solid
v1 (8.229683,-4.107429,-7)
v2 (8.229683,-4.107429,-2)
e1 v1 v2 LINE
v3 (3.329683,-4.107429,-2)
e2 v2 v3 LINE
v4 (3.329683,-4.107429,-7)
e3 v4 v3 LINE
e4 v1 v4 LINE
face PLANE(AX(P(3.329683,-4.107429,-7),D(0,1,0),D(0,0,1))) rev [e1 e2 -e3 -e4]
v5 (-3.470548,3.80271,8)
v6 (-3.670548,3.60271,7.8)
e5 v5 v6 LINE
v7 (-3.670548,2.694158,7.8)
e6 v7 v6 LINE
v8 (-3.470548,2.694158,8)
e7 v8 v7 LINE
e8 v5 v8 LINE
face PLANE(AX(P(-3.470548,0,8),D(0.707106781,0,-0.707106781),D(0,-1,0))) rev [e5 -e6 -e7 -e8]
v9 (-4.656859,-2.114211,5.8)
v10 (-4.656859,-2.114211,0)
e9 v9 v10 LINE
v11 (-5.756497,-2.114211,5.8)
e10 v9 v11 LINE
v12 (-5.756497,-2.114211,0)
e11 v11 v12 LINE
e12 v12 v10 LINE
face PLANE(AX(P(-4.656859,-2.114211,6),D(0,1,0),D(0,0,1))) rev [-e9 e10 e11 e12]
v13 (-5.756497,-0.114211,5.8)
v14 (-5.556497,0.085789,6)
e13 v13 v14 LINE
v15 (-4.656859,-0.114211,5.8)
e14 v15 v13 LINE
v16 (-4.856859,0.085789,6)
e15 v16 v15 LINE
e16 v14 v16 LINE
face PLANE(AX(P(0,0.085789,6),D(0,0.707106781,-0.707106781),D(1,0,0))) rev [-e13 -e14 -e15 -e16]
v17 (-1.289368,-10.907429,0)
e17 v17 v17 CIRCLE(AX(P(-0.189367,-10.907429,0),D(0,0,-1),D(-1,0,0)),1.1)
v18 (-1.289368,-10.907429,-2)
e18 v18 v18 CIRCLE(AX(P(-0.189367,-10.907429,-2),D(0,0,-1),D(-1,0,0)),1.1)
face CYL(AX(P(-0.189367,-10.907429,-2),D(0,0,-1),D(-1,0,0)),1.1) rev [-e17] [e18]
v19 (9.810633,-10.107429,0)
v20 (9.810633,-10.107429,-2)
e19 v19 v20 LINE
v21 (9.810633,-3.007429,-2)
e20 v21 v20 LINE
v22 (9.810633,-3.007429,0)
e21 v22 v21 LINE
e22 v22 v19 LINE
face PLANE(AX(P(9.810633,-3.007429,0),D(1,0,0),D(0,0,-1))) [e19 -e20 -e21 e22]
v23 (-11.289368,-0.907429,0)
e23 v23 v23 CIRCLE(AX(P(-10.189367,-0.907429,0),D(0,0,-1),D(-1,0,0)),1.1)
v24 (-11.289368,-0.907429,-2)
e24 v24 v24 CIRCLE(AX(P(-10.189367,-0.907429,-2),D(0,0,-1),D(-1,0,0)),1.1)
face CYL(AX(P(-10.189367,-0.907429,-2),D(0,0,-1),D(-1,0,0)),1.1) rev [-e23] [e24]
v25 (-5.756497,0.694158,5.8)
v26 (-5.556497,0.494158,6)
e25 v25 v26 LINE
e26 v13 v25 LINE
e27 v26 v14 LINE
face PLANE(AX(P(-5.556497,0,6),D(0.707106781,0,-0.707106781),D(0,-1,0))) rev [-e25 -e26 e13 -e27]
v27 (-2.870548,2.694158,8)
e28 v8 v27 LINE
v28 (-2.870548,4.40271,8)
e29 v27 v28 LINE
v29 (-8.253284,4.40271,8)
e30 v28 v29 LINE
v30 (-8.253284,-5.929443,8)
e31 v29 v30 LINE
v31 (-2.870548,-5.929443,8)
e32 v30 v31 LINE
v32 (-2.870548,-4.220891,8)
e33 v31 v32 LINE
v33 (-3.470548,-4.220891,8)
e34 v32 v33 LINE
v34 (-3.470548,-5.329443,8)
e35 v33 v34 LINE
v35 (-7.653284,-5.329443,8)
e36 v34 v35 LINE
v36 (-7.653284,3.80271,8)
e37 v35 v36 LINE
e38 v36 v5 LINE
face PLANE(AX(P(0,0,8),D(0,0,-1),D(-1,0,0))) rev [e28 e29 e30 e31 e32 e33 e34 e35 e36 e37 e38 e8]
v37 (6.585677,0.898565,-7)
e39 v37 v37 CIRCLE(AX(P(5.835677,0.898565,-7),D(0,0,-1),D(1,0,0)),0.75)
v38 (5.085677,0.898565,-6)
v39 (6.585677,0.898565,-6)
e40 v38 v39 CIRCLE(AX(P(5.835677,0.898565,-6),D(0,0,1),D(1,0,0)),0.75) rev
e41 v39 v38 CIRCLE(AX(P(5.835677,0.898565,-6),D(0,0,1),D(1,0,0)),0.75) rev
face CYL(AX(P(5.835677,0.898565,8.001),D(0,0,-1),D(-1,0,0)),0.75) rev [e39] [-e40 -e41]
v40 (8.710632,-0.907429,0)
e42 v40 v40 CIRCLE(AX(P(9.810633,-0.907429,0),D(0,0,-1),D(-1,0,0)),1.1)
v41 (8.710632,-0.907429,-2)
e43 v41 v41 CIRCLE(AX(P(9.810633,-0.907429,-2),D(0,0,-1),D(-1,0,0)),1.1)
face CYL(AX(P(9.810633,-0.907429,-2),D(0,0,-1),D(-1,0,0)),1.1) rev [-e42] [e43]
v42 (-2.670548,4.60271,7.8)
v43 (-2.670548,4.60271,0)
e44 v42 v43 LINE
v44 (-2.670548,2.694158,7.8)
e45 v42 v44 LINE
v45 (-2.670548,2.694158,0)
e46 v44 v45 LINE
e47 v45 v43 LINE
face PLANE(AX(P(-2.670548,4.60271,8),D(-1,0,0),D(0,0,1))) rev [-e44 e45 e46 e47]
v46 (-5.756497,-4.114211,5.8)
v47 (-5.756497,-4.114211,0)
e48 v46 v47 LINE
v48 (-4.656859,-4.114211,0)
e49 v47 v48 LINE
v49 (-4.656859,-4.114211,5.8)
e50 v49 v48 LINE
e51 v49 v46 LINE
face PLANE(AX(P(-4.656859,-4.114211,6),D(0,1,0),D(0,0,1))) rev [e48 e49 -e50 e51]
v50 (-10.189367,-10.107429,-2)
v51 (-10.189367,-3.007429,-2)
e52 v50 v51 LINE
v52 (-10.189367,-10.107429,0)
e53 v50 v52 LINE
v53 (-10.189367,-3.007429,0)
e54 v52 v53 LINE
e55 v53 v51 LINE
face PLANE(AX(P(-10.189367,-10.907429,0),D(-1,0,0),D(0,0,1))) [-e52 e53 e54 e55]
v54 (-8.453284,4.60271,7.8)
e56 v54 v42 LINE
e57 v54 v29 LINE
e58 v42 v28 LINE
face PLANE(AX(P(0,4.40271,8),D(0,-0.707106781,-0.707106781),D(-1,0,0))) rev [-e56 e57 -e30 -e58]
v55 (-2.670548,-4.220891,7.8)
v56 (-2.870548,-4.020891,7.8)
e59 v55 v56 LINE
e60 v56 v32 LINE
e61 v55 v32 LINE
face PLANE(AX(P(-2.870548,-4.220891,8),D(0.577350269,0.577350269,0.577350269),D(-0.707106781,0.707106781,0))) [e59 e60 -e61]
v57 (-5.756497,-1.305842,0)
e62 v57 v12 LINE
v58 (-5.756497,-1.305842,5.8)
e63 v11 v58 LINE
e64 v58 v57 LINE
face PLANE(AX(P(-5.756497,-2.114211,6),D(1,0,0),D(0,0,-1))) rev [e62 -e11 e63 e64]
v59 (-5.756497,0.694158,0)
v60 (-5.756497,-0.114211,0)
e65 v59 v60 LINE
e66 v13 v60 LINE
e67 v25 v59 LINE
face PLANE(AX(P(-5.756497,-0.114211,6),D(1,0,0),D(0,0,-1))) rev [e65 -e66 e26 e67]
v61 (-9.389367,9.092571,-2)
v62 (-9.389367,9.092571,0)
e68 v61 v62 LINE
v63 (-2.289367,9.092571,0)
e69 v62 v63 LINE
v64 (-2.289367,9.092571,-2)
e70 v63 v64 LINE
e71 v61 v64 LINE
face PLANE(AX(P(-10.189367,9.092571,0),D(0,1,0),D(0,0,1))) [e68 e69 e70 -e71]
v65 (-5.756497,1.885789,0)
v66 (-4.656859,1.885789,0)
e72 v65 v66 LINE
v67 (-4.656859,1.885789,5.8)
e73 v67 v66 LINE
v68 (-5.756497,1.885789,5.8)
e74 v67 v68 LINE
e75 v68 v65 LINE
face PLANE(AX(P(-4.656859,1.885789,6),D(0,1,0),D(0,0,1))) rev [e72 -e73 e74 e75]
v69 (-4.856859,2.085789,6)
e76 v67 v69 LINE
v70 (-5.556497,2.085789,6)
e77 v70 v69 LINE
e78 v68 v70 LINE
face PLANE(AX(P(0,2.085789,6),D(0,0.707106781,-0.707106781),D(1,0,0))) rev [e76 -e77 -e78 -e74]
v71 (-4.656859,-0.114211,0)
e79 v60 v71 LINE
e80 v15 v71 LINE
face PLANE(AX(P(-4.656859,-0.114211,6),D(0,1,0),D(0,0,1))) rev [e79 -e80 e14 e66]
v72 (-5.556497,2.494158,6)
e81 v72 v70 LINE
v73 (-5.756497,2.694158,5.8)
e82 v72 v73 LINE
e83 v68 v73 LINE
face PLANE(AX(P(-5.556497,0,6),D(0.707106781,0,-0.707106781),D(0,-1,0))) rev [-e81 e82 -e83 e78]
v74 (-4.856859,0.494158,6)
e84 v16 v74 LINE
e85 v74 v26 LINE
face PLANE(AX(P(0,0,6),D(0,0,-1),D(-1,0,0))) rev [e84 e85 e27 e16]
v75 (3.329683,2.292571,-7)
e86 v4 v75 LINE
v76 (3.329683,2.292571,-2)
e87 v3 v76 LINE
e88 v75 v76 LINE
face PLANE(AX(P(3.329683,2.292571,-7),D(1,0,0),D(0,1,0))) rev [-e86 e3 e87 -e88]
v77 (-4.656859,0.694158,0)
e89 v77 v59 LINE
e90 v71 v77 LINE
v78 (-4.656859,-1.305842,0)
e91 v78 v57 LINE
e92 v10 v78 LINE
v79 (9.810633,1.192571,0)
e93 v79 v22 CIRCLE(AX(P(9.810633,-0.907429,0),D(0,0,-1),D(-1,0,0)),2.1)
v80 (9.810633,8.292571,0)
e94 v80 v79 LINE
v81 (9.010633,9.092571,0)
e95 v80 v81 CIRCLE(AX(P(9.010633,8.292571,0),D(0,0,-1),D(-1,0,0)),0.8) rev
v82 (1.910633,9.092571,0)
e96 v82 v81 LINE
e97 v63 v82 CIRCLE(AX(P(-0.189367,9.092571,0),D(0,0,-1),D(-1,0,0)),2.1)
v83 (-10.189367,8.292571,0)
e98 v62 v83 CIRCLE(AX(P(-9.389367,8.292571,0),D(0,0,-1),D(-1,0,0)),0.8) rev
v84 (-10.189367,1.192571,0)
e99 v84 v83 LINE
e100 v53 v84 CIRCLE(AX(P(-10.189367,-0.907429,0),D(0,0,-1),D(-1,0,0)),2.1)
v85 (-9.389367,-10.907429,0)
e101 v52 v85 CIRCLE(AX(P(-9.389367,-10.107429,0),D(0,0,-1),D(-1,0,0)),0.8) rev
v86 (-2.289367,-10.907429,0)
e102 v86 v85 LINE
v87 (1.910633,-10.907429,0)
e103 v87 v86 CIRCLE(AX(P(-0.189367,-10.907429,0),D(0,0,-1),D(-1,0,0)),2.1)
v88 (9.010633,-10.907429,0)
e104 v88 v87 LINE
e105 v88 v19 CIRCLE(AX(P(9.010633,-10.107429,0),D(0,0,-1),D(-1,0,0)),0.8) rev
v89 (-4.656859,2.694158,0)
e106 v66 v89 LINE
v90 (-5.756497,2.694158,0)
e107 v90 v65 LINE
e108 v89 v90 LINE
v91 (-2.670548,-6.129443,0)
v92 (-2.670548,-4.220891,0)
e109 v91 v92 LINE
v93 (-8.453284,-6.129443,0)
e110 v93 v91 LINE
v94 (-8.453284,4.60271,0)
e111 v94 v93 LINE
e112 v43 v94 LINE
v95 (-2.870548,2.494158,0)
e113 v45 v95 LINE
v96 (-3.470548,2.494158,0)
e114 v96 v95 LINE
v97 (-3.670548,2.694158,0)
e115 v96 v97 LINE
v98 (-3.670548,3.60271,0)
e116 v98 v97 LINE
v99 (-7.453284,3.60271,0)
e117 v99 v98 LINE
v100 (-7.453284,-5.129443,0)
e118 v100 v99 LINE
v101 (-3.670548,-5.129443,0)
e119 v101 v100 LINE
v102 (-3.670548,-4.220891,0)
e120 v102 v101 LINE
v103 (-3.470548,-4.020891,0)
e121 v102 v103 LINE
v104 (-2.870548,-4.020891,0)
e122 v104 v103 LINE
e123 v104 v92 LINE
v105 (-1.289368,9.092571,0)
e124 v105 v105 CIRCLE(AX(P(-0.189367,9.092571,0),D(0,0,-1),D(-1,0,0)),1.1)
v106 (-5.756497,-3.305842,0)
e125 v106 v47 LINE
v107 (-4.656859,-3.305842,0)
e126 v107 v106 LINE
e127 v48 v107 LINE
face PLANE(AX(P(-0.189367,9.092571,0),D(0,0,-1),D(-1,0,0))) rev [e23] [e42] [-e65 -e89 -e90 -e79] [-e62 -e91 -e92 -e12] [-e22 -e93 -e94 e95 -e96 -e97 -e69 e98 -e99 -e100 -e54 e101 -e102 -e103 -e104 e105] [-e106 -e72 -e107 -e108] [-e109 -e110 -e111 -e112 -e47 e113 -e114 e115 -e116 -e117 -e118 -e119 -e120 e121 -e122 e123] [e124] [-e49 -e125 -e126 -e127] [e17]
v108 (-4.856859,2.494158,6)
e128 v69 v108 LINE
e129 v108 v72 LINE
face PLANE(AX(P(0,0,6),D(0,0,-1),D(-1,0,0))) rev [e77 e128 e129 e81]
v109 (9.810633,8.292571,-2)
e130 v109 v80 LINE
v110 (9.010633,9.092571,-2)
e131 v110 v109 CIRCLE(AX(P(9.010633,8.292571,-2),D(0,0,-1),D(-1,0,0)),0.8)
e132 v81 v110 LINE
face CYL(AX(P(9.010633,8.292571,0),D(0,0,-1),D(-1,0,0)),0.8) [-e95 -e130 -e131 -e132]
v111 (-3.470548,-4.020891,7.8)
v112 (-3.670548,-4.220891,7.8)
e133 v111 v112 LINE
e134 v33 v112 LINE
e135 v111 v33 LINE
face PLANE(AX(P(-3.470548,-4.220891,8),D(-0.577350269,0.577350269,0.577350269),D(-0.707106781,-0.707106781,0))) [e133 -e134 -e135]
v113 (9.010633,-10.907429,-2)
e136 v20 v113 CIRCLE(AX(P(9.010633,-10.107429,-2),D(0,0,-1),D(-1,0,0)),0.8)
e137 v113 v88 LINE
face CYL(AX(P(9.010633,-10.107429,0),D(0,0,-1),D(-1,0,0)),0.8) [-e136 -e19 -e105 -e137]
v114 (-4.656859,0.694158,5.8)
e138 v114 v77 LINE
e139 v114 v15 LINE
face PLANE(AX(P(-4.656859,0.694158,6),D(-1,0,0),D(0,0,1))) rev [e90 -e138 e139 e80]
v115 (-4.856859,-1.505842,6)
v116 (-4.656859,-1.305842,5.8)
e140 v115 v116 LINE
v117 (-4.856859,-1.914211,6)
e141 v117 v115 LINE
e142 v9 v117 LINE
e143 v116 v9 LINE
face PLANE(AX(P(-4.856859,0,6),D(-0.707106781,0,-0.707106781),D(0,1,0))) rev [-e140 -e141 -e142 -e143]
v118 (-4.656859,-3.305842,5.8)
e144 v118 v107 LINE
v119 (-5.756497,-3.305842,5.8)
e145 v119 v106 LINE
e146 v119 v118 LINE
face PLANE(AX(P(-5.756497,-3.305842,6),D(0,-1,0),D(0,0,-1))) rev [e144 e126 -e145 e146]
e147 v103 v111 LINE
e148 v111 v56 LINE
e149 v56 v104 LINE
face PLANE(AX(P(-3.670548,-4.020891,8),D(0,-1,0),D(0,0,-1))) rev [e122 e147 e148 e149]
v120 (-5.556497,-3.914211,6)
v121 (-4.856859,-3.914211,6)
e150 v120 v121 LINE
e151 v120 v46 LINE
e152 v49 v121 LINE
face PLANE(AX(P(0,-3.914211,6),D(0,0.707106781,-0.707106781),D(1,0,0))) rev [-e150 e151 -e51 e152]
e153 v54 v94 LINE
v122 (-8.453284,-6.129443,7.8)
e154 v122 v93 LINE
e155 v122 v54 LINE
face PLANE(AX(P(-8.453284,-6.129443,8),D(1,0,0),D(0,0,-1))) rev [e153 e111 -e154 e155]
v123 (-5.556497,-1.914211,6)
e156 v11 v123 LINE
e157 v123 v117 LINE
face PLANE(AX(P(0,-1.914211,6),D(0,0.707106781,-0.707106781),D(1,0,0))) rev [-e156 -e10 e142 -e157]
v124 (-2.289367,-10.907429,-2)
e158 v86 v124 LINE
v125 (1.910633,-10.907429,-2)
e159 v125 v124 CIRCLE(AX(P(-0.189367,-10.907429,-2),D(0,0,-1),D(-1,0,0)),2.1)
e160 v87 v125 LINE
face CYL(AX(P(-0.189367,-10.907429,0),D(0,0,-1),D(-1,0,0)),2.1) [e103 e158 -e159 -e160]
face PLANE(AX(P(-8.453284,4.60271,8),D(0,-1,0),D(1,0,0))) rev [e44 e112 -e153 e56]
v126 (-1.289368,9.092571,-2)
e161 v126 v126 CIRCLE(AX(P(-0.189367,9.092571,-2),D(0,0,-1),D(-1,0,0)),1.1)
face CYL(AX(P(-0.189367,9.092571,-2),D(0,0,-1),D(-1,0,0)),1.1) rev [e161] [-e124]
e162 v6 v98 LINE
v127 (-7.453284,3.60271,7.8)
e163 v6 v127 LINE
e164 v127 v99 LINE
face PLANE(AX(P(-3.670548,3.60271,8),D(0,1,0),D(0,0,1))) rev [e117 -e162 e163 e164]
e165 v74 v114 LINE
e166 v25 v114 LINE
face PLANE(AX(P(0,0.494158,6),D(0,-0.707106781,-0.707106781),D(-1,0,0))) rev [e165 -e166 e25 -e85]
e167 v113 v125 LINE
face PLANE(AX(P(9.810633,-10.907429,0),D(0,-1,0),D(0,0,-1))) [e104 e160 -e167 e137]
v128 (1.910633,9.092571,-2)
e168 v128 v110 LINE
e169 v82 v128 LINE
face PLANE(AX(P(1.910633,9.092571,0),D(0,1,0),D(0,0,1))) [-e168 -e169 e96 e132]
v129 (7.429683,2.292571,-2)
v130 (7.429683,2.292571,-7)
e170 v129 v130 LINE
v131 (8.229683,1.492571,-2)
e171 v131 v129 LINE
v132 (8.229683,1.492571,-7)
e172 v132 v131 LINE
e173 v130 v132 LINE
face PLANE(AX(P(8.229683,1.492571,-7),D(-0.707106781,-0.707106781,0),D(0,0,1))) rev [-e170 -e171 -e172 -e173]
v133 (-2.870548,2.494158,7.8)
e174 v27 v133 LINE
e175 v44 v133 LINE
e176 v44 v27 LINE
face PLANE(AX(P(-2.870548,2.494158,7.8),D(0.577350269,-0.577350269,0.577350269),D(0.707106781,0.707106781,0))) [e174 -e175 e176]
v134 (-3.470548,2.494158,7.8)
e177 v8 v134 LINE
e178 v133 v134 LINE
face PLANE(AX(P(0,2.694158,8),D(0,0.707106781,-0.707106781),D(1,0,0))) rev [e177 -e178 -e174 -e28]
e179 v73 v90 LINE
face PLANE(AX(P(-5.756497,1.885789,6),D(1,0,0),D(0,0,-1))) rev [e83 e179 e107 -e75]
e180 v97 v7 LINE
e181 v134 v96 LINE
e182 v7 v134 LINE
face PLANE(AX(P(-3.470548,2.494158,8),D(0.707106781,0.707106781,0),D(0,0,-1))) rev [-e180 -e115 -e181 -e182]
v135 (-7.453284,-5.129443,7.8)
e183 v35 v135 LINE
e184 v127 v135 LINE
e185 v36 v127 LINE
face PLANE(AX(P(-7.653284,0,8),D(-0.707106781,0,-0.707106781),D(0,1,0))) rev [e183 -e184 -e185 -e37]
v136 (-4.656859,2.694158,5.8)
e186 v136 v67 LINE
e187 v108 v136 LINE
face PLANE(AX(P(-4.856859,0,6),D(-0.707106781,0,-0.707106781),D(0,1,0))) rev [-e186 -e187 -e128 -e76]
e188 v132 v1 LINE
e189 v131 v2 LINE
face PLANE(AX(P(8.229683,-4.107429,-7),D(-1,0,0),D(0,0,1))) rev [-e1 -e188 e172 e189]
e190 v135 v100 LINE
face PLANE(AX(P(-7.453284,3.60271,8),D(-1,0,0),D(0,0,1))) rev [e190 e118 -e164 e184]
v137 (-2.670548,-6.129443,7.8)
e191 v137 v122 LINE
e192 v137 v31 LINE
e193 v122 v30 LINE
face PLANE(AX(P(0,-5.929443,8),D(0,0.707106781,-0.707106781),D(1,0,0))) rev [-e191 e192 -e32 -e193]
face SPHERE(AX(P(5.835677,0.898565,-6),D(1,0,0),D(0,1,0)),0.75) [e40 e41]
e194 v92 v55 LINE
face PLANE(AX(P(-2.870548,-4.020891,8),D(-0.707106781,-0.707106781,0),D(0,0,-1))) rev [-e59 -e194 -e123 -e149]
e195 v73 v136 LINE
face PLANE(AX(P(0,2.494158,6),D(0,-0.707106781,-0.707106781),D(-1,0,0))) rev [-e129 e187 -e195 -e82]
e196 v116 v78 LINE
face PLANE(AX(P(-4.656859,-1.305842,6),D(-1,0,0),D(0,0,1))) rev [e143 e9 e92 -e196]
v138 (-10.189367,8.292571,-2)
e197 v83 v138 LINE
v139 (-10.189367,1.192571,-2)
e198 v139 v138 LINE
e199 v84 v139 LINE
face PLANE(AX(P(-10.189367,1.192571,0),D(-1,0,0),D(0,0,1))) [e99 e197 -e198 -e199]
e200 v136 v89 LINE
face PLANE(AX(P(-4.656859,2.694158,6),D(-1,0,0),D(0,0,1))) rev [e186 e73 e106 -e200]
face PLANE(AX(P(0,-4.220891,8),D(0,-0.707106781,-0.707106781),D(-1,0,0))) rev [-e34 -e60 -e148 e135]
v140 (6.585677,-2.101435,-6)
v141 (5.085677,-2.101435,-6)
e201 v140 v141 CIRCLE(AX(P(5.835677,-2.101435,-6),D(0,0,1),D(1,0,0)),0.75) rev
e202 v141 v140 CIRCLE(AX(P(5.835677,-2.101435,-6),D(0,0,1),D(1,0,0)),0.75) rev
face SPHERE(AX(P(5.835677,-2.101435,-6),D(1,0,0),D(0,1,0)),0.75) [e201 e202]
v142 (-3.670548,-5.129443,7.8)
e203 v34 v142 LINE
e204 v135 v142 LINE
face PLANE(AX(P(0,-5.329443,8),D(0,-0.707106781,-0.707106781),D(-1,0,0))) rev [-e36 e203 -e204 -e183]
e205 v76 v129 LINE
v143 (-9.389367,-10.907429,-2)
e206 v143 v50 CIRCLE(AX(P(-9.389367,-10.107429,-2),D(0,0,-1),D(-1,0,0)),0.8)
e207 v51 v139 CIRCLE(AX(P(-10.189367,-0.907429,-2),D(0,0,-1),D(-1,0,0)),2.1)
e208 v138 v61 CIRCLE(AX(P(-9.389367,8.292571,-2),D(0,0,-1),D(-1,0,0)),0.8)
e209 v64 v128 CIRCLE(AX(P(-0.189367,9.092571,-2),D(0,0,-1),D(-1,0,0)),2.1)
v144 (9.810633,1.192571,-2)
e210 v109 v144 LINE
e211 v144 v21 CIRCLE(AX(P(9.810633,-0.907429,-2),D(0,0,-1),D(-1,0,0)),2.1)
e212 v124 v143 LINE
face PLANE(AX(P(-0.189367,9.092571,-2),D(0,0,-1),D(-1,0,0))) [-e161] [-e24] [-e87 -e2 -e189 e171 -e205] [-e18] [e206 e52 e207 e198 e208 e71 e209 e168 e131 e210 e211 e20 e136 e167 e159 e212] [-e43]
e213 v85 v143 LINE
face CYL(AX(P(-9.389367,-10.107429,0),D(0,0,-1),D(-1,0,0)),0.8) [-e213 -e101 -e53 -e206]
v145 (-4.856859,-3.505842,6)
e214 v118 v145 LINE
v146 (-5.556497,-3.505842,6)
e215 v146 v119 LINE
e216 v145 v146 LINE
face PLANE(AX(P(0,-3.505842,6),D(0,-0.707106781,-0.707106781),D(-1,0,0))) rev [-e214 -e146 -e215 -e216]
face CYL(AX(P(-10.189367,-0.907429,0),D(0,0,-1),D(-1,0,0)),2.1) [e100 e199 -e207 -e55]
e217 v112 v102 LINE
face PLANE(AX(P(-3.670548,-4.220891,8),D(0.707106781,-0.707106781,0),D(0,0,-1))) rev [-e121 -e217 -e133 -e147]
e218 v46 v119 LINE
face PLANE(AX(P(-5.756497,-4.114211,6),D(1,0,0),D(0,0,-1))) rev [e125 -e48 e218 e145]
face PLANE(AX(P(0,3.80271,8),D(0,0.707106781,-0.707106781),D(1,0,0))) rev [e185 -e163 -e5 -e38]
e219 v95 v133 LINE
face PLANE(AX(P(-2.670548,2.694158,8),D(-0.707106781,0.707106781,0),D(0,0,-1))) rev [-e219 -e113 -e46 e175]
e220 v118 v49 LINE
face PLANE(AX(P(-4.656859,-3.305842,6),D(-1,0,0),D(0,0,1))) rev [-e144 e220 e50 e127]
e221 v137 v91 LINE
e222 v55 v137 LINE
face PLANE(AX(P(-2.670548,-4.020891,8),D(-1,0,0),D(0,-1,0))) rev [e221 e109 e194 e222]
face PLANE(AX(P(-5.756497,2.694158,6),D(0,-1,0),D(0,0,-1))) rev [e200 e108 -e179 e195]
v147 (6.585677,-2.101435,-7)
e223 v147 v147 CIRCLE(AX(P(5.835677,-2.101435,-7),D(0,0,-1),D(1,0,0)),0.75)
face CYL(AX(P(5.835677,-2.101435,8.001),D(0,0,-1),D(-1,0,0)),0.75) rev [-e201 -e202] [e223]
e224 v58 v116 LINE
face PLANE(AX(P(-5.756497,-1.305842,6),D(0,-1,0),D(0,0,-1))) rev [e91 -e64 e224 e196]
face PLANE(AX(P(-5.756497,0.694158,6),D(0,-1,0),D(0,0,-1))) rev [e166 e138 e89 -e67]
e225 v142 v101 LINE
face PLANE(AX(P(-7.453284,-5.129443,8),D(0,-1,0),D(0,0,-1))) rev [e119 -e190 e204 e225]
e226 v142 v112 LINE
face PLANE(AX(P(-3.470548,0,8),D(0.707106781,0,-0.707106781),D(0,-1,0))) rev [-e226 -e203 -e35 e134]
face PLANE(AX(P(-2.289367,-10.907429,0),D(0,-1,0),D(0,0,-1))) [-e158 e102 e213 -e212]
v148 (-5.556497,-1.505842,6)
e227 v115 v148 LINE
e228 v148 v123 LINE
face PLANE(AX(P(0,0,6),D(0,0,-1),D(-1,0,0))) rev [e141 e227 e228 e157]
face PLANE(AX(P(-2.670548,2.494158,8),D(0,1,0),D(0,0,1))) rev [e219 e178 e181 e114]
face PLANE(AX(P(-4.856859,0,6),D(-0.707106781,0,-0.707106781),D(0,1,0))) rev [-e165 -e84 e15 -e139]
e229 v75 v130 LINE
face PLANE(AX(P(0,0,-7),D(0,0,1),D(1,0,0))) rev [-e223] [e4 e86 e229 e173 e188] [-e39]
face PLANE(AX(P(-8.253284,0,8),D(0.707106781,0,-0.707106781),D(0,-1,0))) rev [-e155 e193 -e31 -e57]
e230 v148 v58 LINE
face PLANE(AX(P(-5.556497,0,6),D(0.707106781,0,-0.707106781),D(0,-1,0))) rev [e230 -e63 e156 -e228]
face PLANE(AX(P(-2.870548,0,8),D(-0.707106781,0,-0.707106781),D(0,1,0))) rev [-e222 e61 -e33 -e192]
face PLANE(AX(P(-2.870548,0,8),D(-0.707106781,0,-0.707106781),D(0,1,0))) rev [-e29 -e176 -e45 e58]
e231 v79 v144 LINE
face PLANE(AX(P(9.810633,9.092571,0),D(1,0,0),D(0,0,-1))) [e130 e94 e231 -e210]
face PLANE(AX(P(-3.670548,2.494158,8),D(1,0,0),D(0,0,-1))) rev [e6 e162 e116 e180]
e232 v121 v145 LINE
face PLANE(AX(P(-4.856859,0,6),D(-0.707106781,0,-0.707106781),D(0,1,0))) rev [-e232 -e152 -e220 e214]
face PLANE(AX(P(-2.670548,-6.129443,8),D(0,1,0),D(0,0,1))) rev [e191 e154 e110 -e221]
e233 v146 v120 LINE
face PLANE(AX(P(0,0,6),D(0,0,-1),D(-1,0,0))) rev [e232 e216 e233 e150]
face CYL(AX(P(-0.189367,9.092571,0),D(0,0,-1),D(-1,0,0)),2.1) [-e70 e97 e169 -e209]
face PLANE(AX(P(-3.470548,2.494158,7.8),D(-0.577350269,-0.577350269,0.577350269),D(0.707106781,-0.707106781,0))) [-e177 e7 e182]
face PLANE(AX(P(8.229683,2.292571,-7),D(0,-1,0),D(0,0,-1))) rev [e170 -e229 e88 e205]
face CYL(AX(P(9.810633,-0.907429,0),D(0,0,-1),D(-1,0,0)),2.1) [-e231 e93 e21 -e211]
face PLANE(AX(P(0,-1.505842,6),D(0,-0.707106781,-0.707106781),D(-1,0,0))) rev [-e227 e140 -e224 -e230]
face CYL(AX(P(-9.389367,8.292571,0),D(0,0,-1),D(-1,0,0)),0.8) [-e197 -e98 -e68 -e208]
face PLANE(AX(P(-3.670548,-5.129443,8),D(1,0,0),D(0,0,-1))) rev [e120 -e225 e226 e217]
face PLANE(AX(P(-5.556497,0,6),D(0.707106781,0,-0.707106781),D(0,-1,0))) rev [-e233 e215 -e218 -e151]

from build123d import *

# Parameters (mm, degrees)
BOSS_EXTRUDE1_DEPTH   = 2
BOSS_EXTRUDE2_DEPTH   = 8
SKETCH3_W             = 1.099637712
SKETCH3_H             = 0.808368405
BOSS_EXTRUDE3_DEPTH   = 6
SKETCH4_W             = 1.099637712
SKETCH4_H             = 0.808368405
BOSS_EXTRUDE4_DEPTH   = 6
SKETCH5_W             = 1.099637712
SKETCH5_H             = 0.808368405
BOSS_EXTRUDE5_DEPTH   = 6
SKETCH6_W             = 1.099637712
SKETCH6_H             = 0.808368405
BOSS_EXTRUDE6_DEPTH   = 6
SKETCH7_W             = 4.9
SKETCH7_H             = 6.4
BOSS_EXTRUDE7_DEPTH   = 5
F_1_CLEARANCE_HOLE1_D = 2.20000068
CHAMFER1_SIZE         = 0.2
CHAMFER2_SIZE         = 0.8
FILLET1_R             = 0.8


# Read off the part's stored shape, not the designer's step: Cut-Extrude1, Cut-Extrude2
with BuildPart() as part:
    # Sketch1 → Boss-Extrude1 (new body)
    with BuildSketch(Plane(origin=(0, 0, -2), x_dir=(-1, 0, 0), z_dir=(0, 0, -1))):
        with BuildLine():
            Line((-1.910632622, 9.092570703), (-9.810632622, 9.092570703))
            Line((-9.810632622, 9.092570703), (-9.810632622, 1.192570703))
            ThreePointArc((-9.810632622, 1.192570703), (-11.910632622, -0.907429297), (-9.810632622, -3.007429297))
            Line((-9.810632622, -3.007429297), (-9.810632622, -10.907429297))
            Line((-9.810632622, -10.907429297), (-1.910632622, -10.907429297))
            ThreePointArc((-1.910632622, -10.907429297), (0.189367378, -13.007429297), (2.289367378, -10.907429297))
            Line((2.289367378, -10.907429297), (10.189367378, -10.907429297))
            Line((10.189367378, -10.907429297), (10.189367378, -3.007429297))
            ThreePointArc((10.189367378, -3.007429297), (12.289367378, -0.907429297), (10.189367378, 1.192570703))
            Line((10.189367378, 1.192570703), (10.189367378, 9.092570703))
            Line((10.189367378, 9.092570703), (2.289367378, 9.092570703))
            ThreePointArc((2.289367378, 9.092570703), (0.189367378, 11.192570703), (-1.910632622, 9.092570703))
        make_face()
    extrude(amount=-BOSS_EXTRUDE1_DEPTH)

    # Sketch2 → Boss-Extrude2 (add)
    with BuildSketch(Plane.XY):
        Polygon((-2.670547611, -4.020890836), (-2.670547611, -6.129443348), (-8.453284272, -6.129443348), (-8.453284272, 4.602710154), (-2.670547611, 4.602710154), (-2.670547611, 2.494157643), (-3.670547611, 2.494157643), (-3.670547611, 3.602710154), (-7.453284272, 3.602710154), (-7.453284272, -5.129443348), (-3.670547611, -5.129443348), (-3.670547611, -4.020890836), align=None)
    extrude(amount=BOSS_EXTRUDE2_DEPTH)

    # Sketch3 → Boss-Extrude3 (add)
    with BuildSketch(Plane.XY):
        with Locations((-5.206678265, -1.71002656)):
            Rectangle(SKETCH3_W, SKETCH3_H)
    extrude(amount=BOSS_EXTRUDE3_DEPTH)

    # Sketch4 → Boss-Extrude4 (add)
    with BuildSketch(Plane.XY):
        with Locations((-5.206678265, 2.28997344)):
            Rectangle(SKETCH4_W, SKETCH4_H)
    extrude(amount=BOSS_EXTRUDE4_DEPTH)

    # Sketch5 → Boss-Extrude5 (add)
    with BuildSketch(Plane.XY):
        with Locations((-5.206678265, 0.289973441)):
            Rectangle(SKETCH5_W, SKETCH5_H)
    extrude(amount=BOSS_EXTRUDE5_DEPTH)

    # Sketch6 → Boss-Extrude6 (add)
    with BuildSketch(Plane.XY):
        with Locations((-5.206678265, -3.71002656)):
            Rectangle(SKETCH6_W, SKETCH6_H)
    extrude(amount=BOSS_EXTRUDE6_DEPTH)

    # Sketch7 → Boss-Extrude7 (add)
    with BuildSketch(Plane(origin=(0, 0, -2), x_dir=(-1, 0, 0), z_dir=(0, 0, -1))):
        with Locations((-5.779682622, -0.907429297)):
            Rectangle(SKETCH7_W, SKETCH7_H)
    extrude(amount=BOSS_EXTRUDE7_DEPTH)

    # Cut-Extrude1 outline → Cut-Extrude1 (revolve, cut)
    with BuildSketch(Plane(origin=(5.83567735, -2.101434569, 0), x_dir=(1, 0, 0), z_dir=(0, -1, 0))):
        with BuildLine():
            Line((0.75, -7), (0.75, -6))
            ThreePointArc((0.75, -6), (0.530330086, -6.530330086), (0, -6.75))
            Line((0, -6.75), (0, -7))
            Line((0, -7), (0.75, -7))
        make_face()
    revolve(axis=Axis((5.83567735, -2.101434569, 0), (0, 0, 1)), mode=Mode.SUBTRACT)

    # Cut-Extrude2 outline → Cut-Extrude2 (revolve, cut)
    with BuildSketch(Plane(origin=(5.83567735, 0.898565431, 0), x_dir=(1, 0, 0), z_dir=(0, -1, 0))):
        with BuildLine():
            Line((0.75, -7), (0.75, -6))
            ThreePointArc((0.75, -6), (0.530330086, -6.530330086), (0, -6.75))
            Line((0, -6.75), (0, -7))
            Line((0, -7), (0.75, -7))
        make_face()
    revolve(axis=Axis((5.83567735, 0.898565431, 0), (0, 0, 1)), mode=Mode.SUBTRACT)

    # #1 Clearance Hole1 (through all)
    with Locations(Plane(origin=(0, 0, -2), x_dir=(-1, 0, 0), z_dir=(0, 0, -1))):
        with Locations((0.189367378, -10.907429297), (0.189367378, 9.092570703), (10.189367378, -0.907429297), (-9.810632622, -0.907429297)):
            Hole(F_1_CLEARANCE_HOLE1_D / 2)

    # Chamfer1
    chamfer1_edges = [part.edges().sort_by_distance(p)[0] for p in [
        (-5.206678265, -0.114210762, 6),
        (-4.656859409, 0.28997344, 6),
        (-5.206678265, 0.694157643, 6),
        (-5.756497121, 0.28997344, 6),
        (-5.206678265, -3.305842357, 6),
        (-5.756497121, -3.71002656, 6),
        (-5.206678265, -4.114210762, 6),
        (-4.656859409, -3.71002656, 6),
        (-2.670547611, -4.020890836, 4),
        (-3.670547611, -4.020890836, 4),
        (-3.670547611, 2.494157643, 4),
        (-2.670547611, 2.494157643, 4),
        (-3.170547611, -4.020890836, 8),
        (-3.670547611, -4.575167092, 8),
        (-5.561915941, -5.129443348, 8),
        (-7.453284272, -0.763366597, 8),
        (-5.561915941, 3.602710154, 8),
        (-3.670547611, 3.048433899, 8),
        (-3.170547611, 2.494157643, 8),
        (-2.670547611, 3.548433899, 8),
        (-5.561915941, 4.602710154, 8),
        (-8.453284272, -0.763366597, 8),
        (-5.561915941, -6.129443348, 8),
        (-2.670547611, -5.075167092, 8),
        (-4.656859409, -1.71002656, 6),
        (-5.206678265, -1.305842357, 6),
        (-5.756497121, -1.71002656, 6),
        (-5.206678265, -2.114210762, 6),
        (-4.656859409, 2.28997344, 6),
        (-5.206678265, 2.694157643, 6),
        (-5.756497121, 2.28997344, 6),
        (-5.206678265, 1.885789238, 6),
    ]]
    chamfer(chamfer1_edges, length=CHAMFER1_SIZE)

    # Chamfer2
    chamfer2_edges = [part.edges().sort_by_distance(p)[0] for p in [
        (8.229682622, 2.292570703, -4.5),
    ]]
    chamfer(chamfer2_edges, length=CHAMFER2_SIZE)

    # Fillet1
    fillet1_edges = [part.edges().sort_by_distance(p)[0] for p in [
        (-10.189367378, 9.092570703, -1),
        (-10.189367378, -10.907429297, -1),
        (9.810632622, -10.907429297, -1),
        (9.810632622, 9.092570703, -1),
    ]]
    fillet(fillet1_edges, radius=FILLET1_R)


solid = part.part
